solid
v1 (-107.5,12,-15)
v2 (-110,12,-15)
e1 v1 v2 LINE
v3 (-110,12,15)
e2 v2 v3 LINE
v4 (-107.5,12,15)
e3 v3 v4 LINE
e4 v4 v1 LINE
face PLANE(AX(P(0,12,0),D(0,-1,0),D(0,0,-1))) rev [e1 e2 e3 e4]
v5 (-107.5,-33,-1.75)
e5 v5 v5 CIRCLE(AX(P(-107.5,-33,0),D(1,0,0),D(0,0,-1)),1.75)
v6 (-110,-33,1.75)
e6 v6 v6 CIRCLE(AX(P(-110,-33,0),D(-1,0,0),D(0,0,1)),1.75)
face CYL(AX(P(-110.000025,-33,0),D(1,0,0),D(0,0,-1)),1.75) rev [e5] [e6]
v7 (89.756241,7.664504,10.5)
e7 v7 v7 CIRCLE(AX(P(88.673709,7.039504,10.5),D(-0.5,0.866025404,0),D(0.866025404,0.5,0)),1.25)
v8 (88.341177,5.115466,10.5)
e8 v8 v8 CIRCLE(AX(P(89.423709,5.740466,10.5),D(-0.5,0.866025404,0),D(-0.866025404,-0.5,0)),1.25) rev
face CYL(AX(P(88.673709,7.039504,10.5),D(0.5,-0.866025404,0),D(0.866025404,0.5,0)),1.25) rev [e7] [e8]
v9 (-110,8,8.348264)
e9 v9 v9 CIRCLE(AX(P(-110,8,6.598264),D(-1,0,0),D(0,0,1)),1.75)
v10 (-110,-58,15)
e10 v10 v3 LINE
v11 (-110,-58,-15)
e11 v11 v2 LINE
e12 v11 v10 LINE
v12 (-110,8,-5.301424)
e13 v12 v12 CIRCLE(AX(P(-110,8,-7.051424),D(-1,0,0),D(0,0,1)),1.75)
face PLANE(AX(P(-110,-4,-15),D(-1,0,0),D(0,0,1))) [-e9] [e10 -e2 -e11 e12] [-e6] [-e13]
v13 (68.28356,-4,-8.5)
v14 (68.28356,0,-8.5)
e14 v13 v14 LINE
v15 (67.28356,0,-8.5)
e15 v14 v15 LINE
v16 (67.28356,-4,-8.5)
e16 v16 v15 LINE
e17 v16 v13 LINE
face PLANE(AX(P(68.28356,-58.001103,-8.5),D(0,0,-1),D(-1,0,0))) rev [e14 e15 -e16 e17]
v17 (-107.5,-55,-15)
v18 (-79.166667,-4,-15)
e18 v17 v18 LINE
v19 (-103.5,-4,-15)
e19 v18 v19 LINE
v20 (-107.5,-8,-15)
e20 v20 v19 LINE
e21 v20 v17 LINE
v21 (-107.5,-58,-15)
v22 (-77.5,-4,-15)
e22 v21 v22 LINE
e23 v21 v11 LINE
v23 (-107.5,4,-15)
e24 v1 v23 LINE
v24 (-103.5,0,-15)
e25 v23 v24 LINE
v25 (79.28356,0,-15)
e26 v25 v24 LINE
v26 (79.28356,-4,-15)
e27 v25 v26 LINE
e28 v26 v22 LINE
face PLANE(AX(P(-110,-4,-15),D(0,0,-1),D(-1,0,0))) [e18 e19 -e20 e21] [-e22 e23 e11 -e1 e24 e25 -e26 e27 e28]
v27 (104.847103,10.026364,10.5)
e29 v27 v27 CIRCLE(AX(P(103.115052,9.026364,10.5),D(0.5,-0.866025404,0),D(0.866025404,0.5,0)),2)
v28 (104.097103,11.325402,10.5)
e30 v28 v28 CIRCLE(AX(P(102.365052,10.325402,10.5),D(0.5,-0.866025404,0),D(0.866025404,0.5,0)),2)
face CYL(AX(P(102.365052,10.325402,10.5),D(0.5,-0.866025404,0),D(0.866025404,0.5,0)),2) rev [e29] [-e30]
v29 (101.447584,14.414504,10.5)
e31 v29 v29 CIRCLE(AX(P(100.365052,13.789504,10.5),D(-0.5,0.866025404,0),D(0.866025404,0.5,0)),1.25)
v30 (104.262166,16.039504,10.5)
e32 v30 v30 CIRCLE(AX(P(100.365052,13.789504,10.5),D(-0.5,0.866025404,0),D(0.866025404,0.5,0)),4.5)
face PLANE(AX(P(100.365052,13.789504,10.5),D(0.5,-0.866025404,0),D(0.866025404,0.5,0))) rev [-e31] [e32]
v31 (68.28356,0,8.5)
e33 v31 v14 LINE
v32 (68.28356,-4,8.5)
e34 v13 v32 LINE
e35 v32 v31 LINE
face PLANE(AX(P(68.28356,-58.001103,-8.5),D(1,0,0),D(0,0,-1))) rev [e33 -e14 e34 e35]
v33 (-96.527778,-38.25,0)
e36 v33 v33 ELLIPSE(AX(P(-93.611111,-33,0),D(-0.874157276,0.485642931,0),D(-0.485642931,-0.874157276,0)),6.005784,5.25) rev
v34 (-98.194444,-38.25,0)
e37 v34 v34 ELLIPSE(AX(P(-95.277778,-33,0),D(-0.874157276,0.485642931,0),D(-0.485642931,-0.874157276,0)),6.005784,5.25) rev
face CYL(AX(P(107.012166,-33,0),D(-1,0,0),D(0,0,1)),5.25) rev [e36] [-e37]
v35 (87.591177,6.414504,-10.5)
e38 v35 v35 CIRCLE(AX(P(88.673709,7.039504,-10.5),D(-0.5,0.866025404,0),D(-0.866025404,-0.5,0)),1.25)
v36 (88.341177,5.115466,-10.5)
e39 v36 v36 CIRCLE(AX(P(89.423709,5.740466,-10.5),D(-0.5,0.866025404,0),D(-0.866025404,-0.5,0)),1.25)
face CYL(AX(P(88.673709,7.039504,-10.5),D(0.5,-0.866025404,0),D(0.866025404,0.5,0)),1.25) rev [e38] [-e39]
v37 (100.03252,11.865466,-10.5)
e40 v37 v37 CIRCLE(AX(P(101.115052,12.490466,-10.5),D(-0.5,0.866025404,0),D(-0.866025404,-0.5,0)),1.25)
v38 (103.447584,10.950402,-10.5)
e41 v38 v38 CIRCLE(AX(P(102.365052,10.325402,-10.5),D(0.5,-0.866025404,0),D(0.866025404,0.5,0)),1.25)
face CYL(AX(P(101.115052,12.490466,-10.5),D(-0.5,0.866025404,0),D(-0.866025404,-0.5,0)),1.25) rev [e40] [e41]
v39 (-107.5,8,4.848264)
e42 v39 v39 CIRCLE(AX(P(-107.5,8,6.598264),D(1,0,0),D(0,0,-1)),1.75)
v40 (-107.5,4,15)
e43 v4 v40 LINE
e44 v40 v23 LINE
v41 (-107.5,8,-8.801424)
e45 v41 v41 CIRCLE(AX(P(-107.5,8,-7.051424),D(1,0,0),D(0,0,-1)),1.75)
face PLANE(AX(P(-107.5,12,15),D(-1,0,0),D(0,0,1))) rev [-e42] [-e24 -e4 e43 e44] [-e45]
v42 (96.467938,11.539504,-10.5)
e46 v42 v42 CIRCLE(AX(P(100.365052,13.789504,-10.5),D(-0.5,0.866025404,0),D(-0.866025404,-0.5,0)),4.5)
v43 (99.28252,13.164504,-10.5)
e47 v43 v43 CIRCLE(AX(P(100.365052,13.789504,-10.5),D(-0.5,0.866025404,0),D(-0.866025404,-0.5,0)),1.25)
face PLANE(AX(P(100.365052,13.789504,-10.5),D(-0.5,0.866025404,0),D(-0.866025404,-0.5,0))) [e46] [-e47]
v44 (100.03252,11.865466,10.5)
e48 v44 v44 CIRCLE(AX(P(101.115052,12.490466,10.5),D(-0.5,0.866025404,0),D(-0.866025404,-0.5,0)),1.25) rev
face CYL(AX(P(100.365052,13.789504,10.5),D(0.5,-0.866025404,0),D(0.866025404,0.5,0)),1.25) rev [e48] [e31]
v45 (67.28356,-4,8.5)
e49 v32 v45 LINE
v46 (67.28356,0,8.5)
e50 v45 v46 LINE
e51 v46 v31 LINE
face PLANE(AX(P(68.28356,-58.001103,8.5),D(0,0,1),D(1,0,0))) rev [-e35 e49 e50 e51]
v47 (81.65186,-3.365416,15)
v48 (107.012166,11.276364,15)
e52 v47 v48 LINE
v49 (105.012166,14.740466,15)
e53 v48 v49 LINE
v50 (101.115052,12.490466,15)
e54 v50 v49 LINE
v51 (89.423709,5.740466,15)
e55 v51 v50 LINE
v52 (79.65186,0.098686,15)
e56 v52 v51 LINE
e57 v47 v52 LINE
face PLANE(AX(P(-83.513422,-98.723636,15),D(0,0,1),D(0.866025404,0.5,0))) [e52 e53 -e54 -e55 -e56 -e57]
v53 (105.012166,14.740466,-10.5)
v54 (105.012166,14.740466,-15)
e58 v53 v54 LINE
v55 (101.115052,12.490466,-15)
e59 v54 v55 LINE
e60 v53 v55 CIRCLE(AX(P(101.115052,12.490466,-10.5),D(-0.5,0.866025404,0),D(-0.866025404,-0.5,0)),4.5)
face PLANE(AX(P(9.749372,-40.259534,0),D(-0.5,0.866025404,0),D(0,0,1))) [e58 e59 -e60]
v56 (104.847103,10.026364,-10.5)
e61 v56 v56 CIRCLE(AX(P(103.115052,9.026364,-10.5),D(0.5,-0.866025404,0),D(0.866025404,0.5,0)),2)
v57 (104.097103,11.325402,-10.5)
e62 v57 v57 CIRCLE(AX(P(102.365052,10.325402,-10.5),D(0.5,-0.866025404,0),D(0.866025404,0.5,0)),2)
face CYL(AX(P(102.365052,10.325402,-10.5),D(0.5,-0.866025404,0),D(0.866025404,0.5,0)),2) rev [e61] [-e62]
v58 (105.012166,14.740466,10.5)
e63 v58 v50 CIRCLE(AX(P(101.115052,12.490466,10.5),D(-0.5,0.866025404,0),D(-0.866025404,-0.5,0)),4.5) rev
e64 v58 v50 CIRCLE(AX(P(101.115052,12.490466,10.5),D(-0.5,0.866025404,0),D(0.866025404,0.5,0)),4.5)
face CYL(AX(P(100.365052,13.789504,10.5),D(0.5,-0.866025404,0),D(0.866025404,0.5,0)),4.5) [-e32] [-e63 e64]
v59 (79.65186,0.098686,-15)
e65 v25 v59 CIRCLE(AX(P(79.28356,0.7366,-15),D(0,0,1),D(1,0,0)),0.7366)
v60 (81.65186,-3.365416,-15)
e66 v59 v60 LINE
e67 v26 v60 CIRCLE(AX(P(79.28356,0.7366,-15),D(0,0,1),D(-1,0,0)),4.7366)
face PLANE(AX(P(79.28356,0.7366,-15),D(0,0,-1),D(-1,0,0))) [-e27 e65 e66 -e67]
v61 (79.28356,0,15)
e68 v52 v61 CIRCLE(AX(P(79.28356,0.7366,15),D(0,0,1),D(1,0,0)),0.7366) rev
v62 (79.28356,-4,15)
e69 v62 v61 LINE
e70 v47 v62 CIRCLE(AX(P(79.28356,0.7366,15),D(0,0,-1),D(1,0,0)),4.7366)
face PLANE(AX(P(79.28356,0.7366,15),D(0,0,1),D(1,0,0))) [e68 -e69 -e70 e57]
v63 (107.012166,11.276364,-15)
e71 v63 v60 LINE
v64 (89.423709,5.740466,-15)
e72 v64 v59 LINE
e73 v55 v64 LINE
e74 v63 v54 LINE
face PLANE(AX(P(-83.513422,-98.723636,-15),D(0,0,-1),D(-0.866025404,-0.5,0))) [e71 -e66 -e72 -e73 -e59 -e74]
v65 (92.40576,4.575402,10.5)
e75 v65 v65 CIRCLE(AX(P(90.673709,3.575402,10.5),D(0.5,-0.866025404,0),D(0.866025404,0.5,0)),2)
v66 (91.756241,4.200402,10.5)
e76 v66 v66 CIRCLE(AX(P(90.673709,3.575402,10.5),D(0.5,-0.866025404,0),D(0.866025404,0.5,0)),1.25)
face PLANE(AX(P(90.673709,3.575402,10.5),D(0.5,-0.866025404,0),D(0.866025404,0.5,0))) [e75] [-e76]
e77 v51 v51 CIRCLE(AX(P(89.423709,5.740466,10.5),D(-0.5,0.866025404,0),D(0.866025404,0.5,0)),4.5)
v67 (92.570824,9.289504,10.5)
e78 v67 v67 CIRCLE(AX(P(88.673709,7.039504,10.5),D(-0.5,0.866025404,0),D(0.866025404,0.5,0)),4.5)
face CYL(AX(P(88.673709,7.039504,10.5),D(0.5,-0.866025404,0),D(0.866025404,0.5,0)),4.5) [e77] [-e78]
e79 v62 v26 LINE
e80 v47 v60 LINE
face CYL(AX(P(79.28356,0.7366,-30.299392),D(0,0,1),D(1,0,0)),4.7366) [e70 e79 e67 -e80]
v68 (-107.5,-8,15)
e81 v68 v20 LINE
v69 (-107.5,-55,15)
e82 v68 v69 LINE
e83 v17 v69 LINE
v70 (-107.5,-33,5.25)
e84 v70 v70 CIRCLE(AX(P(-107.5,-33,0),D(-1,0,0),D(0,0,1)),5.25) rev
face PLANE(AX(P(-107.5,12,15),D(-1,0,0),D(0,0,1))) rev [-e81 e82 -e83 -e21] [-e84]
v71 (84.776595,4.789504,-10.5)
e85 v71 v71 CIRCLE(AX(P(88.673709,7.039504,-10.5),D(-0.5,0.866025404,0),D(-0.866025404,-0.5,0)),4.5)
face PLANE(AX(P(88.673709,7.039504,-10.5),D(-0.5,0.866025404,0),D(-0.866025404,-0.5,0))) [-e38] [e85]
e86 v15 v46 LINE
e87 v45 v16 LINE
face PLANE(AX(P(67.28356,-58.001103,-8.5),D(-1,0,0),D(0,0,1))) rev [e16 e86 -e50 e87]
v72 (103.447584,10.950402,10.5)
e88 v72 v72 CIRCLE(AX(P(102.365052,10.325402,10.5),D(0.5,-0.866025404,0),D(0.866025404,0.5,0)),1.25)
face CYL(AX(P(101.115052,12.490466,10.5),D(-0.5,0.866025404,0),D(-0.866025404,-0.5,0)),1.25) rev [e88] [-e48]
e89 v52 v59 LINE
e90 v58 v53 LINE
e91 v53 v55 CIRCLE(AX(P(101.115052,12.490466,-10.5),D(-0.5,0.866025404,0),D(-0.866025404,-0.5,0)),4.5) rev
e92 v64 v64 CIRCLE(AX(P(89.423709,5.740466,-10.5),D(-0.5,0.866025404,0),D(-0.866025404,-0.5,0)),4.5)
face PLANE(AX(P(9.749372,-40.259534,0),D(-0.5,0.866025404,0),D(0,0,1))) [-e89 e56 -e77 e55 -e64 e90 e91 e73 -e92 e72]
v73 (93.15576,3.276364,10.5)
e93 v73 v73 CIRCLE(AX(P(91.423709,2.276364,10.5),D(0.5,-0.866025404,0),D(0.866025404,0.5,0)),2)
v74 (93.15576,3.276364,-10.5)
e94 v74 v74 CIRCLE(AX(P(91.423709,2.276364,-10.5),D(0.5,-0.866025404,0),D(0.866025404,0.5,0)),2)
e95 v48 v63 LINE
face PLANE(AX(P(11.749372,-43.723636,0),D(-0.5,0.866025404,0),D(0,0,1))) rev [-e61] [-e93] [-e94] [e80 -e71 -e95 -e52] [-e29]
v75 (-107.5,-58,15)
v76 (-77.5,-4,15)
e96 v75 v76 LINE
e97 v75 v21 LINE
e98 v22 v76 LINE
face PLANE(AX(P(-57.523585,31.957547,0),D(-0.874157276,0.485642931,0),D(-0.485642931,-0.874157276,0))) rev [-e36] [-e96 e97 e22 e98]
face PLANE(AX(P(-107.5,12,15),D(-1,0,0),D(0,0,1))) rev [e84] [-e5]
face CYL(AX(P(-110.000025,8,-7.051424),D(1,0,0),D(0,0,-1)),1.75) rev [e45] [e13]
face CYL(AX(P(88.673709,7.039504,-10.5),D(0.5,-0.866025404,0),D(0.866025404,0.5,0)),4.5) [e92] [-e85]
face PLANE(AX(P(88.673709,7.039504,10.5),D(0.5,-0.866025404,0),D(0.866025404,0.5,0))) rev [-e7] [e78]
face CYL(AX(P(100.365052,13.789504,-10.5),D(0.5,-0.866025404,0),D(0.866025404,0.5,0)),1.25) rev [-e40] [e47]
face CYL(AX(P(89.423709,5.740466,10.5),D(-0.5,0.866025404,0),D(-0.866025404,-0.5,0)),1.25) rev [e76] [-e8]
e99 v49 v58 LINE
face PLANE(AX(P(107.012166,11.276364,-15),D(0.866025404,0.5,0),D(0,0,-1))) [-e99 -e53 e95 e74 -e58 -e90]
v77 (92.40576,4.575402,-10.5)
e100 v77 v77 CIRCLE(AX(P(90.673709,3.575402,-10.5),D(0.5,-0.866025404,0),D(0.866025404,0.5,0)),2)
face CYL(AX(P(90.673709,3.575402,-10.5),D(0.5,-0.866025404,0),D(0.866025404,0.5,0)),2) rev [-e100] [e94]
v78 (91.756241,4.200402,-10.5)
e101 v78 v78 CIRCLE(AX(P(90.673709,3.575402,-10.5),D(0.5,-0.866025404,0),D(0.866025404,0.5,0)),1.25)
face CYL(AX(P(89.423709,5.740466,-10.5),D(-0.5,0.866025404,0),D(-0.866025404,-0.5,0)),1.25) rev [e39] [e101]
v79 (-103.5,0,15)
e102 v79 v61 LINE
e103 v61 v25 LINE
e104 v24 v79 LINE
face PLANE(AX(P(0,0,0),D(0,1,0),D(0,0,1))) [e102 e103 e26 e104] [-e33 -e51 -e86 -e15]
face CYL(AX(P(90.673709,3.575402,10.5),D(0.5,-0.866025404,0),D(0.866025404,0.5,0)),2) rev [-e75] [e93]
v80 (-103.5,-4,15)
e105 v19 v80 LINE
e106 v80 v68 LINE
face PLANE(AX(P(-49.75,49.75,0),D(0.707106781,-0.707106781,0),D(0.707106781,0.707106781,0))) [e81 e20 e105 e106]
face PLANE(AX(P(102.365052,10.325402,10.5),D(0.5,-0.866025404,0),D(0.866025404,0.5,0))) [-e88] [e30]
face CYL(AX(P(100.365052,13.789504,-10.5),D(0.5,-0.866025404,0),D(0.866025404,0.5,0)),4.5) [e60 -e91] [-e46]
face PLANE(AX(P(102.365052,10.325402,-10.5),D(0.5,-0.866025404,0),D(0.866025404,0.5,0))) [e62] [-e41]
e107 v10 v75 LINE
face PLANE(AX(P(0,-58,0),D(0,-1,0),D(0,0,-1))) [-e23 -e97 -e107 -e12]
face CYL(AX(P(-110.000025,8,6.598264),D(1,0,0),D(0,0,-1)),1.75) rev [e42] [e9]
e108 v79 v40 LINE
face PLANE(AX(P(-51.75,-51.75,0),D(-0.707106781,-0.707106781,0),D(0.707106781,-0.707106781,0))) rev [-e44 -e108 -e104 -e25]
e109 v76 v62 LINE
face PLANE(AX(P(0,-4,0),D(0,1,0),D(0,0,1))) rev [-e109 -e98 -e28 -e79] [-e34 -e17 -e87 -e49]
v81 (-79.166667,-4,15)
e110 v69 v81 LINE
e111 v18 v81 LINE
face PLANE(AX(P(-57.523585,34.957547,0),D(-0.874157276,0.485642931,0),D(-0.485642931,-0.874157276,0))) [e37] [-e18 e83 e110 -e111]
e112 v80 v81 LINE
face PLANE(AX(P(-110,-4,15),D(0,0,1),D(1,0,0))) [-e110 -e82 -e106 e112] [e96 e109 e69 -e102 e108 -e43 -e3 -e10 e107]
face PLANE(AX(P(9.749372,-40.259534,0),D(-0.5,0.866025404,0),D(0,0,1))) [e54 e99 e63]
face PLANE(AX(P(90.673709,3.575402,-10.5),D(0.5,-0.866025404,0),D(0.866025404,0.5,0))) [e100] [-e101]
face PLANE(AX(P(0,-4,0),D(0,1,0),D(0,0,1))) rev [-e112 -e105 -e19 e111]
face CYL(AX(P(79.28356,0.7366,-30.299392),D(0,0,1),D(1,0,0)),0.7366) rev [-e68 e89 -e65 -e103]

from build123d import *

# Parameters (mm, degrees)
ESQUISSE2_W                 = 220
ESQUISSE2_H                 = 30
T_LE_DE_BASE_PLI_E1_DEPTH   = 4
PLI_START                   = -15
PLI_ESQUISS_1_DEPTH         = 30
PLI_ESQUISS_1_2_DEPTH       = 30
ESQUISSE9_R                 = 4.5
ESQUISSE9_R_2               = 1.25
BOSS_EXTRU_1_DEPTH          = 1.5
ENL_V_START                 = -4
ENL_V_MAT_EXTRU_1_OUTLINE_R = 1.25
ENL_V_MAT_EXTRU_1_DEPTH     = 4
BOSS_EXTRU_2_DEPTH          = 12
BOSS_EXTRU_2_DEPTH_BACK     = 58
ESQUISSE11_W                = 2.5
ESQUISSE11_H                = 30
BOSS_EXTRU_3_DEPTH          = 3
ESQUISSE13_R                = 2
ENL_V_MAT_EXTRU_2_DEPTH     = 1.5
ENL_V_MAT_EXTRU_3_REACH     = 127.256
ESQUISSE14_W                = 1
ESQUISSE14_H                = 17
ESQUISSE12_R                = 1.75
ENL_V_MAT_EXTRU_4_DEPTH     = 223.720608774
ESQUISSE12_7_R              = 5.25
ESQUISSE12_7_R_2            = 1.75
ENL_V_MAT_EXTRU_5_DEPTH     = 223.720608774
BOSS_EXTRU_4_START          = -15
BOSS_EXTRU_4_DEPTH          = 30


# Read off the part's stored shape, not the designer's step: Pli esquissé1, Enlèv. mat.-Extru.1, Boss.-Extru.4
# Sheet-metal steps are written as plain solids
with BuildPart() as part:
    # Esquisse2 → Tôle de base pliée1 (new body)
    with BuildSketch(Plane(origin=(0, 0, 0), x_dir=(1, 0, 0), z_dir=(0, 1, 0))):
        Rectangle(ESQUISSE2_W, ESQUISSE2_H)
    extrude(amount=-T_LE_DE_BASE_PLI_E1_DEPTH)

    # Pli esquissé1 outline → Pli esquissé1 (cut)
    with BuildSketch(Plane.XY.offset(PLI_START)):
        with BuildLine():
            Line((110, 0), (87.480931171, 0))
            Line((87.480931171, 0), (81.651859795, -3.365415928))
            ThreePointArc((81.651859795, -3.365415928), (80.509482084, -3.838604269), (79.283559795, -4))
            Line((79.283559795, -4), (110, -4))
            Line((110, -4), (110, 0))
        make_face()
    extrude(amount=PLI_ESQUISS_1_DEPTH, mode=Mode.SUBTRACT)

    # Pli esquiss_1 2 outline → Pli esquiss_1 2 (add)
    with BuildSketch(Plane.XY.offset(PLI_START)):
        with BuildLine():
            Line((87.480931171, 0), (107.012166491, 11.27636397))
            Line((107.012166491, 11.27636397), (105.012166491, 14.740465585))
            Line((105.012166491, 14.740465585), (79.651859795, 0.098685688))
            ThreePointArc((79.651859795, 0.098685688), (79.474205904, 0.025099036), (79.283559795, 0))
            Line((79.283559795, 0), (87.480931171, 0))
        make_face()
    extrude(amount=PLI_ESQUISS_1_2_DEPTH)

    # Esquisse9 → Boss.-Extru.1 (add)
    # profile 1 of 4: a face of its own
    with BuildSketch(Plane(origin=(19.870232793, -34.416252755, 0), x_dir=(0.8660254037844382, 0.5000000000000011, 0), z_dir=(-0.5000000000000011, 0.8660254037844382, 0))):
        with Locations(Location((80.313436681, 10.5, 0), (0, 0, 90))):
            Circle(ESQUISSE9_R)
        with Locations(Location((80.313436681, 10.5, 0), (0, 0, 180))):
            Circle(ESQUISSE9_R_2, mode=Mode.SUBTRACT)
    # profile 2 of 4: a face of its own
    with BuildSketch(Plane(origin=(19.870232793, -34.416252755, 0), x_dir=(0.8660254037844382, 0.5000000000000011, 0), z_dir=(-0.5000000000000011, 0.8660254037844382, 0))):
        with Locations((93.813436681, 10.5)):
            Circle(ESQUISSE9_R)
        with Locations(Location((93.813436681, 10.5, 0), (0, 0, 180))):
            Circle(ESQUISSE9_R_2, mode=Mode.SUBTRACT)
    # profile 3 of 4: a face of its own
    with BuildSketch(Plane(origin=(19.870232793, -34.416252755, 0), x_dir=(0.8660254037844382, 0.5000000000000011, 0), z_dir=(-0.5000000000000011, 0.8660254037844382, 0))):
        with Locations((93.813436681, -10.5)):
            Circle(ESQUISSE9_R)
        with Locations((93.813436681, -10.5)):
            Circle(ESQUISSE9_R_2, mode=Mode.SUBTRACT)
    # profile 4 of 4: a face of its own
    with BuildSketch(Plane(origin=(19.870232793, -34.416252755, 0), x_dir=(0.8660254037844382, 0.5000000000000011, 0), z_dir=(-0.5000000000000011, 0.8660254037844382, 0))):
        with Locations((80.313436681, -10.5)):
            Circle(ESQUISSE9_R)
        with Locations((80.313436681, -10.5)):
            Circle(ESQUISSE9_R_2, mode=Mode.SUBTRACT)
    extrude(amount=BOSS_EXTRU_1_DEPTH)

    # Enlèv. mat.-Extru.1 outline → Enlèv. mat.-Extru.1 (cut)
    with BuildSketch(Plane(origin=(19.870232793, -34.416252755, 0), x_dir=(0.8660254037844382, 0.5000000000000011, 0), z_dir=(-0.5000000000000011, 0.8660254037844382, 0)).offset(ENL_V_START)):
        with Locations((93.813436681, 10.5)):
            Circle(ENL_V_MAT_EXTRU_1_OUTLINE_R)
        with Locations((93.813436681, -10.5)):
            Circle(ENL_V_MAT_EXTRU_1_OUTLINE_R)
        with Locations((80.313436681, 10.5)):
            Circle(ENL_V_MAT_EXTRU_1_OUTLINE_R)
        with Locations((80.313436681, -10.5)):
            Circle(ENL_V_MAT_EXTRU_1_OUTLINE_R)
    extrude(amount=ENL_V_MAT_EXTRU_1_DEPTH, mode=Mode.SUBTRACT)

    # Esquisse11 → Boss.-Extru.2 (add, two sides: drawn at the far end of the back side and taken through both)
    with BuildSketch(Plane(origin=(0, 0, 0), x_dir=(1, 0, 0), z_dir=(0, 1, 0)).offset(-BOSS_EXTRU_2_DEPTH_BACK)):
        with Locations((-108.75, 0)):
            Rectangle(ESQUISSE11_W, ESQUISSE11_H)
    extrude(amount=BOSS_EXTRU_2_DEPTH + BOSS_EXTRU_2_DEPTH_BACK)

    # Esquisse3D1 → Boss.-Extru.3 (add, along a direction that is not the sketch's normal)
    with BuildSketch(Plane(origin=(-107.5, -58, -15), x_dir=(0.43685202833051884, 0.7863336509949341, 0.43685202833051917), z_dir=(0.8741572761215378, -0.4856429311786321, 0))):
        Polygon((0, 0), (13.10556085, 26.98600146), (68.673138854, 0), (55.567578004, -26.98600146), align=None)
    extrude(amount=-BOSS_EXTRU_3_DEPTH, dir=(0, -1, 0))

    # Esquisse13 → Enlèv. mat.-Extru.2 (cut)
    with BuildSketch(Plane(origin=(21.870232793, -37.88035437, 0), x_dir=(0.8660254037844382, 0.500000000000001, 0), z_dir=(0.500000000000001, -0.8660254037844382, 0))):
        with Locations((93.813436681, 10.5)):
            Circle(ESQUISSE13_R)
        with Locations((93.813436681, -10.5)):
            Circle(ESQUISSE13_R)
        with Locations((80.313436681, -10.5)):
            Circle(ESQUISSE13_R)
        with Locations((80.313436681, 10.5)):
            Circle(ESQUISSE13_R)
    extrude(amount=-ENL_V_MAT_EXTRU_2_DEPTH, mode=Mode.SUBTRACT)

    # Esquisse14 → Enlèv. mat.-Extru.3 (cut, up to next)
    with BuildSketch(Plane(origin=(0, 0, 0), x_dir=(1, 0, 0), z_dir=(0, 1, 0)), mode=Mode.PRIVATE) as enl_v_mat_extru_3_sk1:
        with Locations((67.783559795, 0)):
            Rectangle(ESQUISSE14_W, ESQUISSE14_H)
    enl_v_mat_extru_3_tool1 = extrude(enl_v_mat_extru_3_sk1.sketch, amount=-ENL_V_MAT_EXTRU_3_REACH, mode=Mode.PRIVATE) & part.part
    add(enl_v_mat_extru_3_tool1.solids().sort_by_distance((67.78356, 0, 0))[0], mode=Mode.SUBTRACT)

    # Esquisse12 → Enlèv. mat.-Extru.4 (cut, through all)
    with BuildSketch(Plane(origin=(-107.5, 0, 0), x_dir=(0, 0, -1), z_dir=(1, 0, 0))):
        with Locations((0, -33)):
            Circle(ESQUISSE12_R)
        with Locations((-6.598263909, 8)):
            Circle(ESQUISSE12_R)
        with Locations((7.051423878, 8)):
            Circle(ESQUISSE12_R)
    extrude(amount=-ENL_V_MAT_EXTRU_4_DEPTH, mode=Mode.SUBTRACT)

    # Esquisse12<7> → Enlèv. mat.-Extru.5 (cut, through all)
    # profile 1 of 2: a face of its own
    with BuildSketch(Plane(origin=(-107.5, 0, 0), x_dir=(0, 0, -1), z_dir=(1, 0, 0))):
        with Locations(Location((0, -33, 0), (0, 0, 270))):
            Circle(ESQUISSE12_7_R)
        with Locations((0, -33)):
            Circle(ESQUISSE12_7_R_2, mode=Mode.SUBTRACT)
    # profile 2 of 2: a face of its own
    with BuildSketch(Plane(origin=(-107.5, 0, 0), x_dir=(0, 0, -1), z_dir=(1, 0, 0))):
        with Locations(Location((0, -33, 0), (0, 0, 270))):
            Circle(ESQUISSE12_7_R)
    extrude(amount=ENL_V_MAT_EXTRU_5_DEPTH, mode=Mode.SUBTRACT)

    # Boss.-Extru.4 outline → Boss.-Extru.4 (add)
    with BuildSketch(Plane.XY.offset(BOSS_EXTRU_4_START)):
        Polygon((-107.5, -4), (-107.5, -8), (-103.5, -4), align=None)
        Polygon((-103.5, 0), (-107.5, 4), (-107.5, 0), align=None)
    extrude(amount=BOSS_EXTRU_4_DEPTH)


solid = part.part
